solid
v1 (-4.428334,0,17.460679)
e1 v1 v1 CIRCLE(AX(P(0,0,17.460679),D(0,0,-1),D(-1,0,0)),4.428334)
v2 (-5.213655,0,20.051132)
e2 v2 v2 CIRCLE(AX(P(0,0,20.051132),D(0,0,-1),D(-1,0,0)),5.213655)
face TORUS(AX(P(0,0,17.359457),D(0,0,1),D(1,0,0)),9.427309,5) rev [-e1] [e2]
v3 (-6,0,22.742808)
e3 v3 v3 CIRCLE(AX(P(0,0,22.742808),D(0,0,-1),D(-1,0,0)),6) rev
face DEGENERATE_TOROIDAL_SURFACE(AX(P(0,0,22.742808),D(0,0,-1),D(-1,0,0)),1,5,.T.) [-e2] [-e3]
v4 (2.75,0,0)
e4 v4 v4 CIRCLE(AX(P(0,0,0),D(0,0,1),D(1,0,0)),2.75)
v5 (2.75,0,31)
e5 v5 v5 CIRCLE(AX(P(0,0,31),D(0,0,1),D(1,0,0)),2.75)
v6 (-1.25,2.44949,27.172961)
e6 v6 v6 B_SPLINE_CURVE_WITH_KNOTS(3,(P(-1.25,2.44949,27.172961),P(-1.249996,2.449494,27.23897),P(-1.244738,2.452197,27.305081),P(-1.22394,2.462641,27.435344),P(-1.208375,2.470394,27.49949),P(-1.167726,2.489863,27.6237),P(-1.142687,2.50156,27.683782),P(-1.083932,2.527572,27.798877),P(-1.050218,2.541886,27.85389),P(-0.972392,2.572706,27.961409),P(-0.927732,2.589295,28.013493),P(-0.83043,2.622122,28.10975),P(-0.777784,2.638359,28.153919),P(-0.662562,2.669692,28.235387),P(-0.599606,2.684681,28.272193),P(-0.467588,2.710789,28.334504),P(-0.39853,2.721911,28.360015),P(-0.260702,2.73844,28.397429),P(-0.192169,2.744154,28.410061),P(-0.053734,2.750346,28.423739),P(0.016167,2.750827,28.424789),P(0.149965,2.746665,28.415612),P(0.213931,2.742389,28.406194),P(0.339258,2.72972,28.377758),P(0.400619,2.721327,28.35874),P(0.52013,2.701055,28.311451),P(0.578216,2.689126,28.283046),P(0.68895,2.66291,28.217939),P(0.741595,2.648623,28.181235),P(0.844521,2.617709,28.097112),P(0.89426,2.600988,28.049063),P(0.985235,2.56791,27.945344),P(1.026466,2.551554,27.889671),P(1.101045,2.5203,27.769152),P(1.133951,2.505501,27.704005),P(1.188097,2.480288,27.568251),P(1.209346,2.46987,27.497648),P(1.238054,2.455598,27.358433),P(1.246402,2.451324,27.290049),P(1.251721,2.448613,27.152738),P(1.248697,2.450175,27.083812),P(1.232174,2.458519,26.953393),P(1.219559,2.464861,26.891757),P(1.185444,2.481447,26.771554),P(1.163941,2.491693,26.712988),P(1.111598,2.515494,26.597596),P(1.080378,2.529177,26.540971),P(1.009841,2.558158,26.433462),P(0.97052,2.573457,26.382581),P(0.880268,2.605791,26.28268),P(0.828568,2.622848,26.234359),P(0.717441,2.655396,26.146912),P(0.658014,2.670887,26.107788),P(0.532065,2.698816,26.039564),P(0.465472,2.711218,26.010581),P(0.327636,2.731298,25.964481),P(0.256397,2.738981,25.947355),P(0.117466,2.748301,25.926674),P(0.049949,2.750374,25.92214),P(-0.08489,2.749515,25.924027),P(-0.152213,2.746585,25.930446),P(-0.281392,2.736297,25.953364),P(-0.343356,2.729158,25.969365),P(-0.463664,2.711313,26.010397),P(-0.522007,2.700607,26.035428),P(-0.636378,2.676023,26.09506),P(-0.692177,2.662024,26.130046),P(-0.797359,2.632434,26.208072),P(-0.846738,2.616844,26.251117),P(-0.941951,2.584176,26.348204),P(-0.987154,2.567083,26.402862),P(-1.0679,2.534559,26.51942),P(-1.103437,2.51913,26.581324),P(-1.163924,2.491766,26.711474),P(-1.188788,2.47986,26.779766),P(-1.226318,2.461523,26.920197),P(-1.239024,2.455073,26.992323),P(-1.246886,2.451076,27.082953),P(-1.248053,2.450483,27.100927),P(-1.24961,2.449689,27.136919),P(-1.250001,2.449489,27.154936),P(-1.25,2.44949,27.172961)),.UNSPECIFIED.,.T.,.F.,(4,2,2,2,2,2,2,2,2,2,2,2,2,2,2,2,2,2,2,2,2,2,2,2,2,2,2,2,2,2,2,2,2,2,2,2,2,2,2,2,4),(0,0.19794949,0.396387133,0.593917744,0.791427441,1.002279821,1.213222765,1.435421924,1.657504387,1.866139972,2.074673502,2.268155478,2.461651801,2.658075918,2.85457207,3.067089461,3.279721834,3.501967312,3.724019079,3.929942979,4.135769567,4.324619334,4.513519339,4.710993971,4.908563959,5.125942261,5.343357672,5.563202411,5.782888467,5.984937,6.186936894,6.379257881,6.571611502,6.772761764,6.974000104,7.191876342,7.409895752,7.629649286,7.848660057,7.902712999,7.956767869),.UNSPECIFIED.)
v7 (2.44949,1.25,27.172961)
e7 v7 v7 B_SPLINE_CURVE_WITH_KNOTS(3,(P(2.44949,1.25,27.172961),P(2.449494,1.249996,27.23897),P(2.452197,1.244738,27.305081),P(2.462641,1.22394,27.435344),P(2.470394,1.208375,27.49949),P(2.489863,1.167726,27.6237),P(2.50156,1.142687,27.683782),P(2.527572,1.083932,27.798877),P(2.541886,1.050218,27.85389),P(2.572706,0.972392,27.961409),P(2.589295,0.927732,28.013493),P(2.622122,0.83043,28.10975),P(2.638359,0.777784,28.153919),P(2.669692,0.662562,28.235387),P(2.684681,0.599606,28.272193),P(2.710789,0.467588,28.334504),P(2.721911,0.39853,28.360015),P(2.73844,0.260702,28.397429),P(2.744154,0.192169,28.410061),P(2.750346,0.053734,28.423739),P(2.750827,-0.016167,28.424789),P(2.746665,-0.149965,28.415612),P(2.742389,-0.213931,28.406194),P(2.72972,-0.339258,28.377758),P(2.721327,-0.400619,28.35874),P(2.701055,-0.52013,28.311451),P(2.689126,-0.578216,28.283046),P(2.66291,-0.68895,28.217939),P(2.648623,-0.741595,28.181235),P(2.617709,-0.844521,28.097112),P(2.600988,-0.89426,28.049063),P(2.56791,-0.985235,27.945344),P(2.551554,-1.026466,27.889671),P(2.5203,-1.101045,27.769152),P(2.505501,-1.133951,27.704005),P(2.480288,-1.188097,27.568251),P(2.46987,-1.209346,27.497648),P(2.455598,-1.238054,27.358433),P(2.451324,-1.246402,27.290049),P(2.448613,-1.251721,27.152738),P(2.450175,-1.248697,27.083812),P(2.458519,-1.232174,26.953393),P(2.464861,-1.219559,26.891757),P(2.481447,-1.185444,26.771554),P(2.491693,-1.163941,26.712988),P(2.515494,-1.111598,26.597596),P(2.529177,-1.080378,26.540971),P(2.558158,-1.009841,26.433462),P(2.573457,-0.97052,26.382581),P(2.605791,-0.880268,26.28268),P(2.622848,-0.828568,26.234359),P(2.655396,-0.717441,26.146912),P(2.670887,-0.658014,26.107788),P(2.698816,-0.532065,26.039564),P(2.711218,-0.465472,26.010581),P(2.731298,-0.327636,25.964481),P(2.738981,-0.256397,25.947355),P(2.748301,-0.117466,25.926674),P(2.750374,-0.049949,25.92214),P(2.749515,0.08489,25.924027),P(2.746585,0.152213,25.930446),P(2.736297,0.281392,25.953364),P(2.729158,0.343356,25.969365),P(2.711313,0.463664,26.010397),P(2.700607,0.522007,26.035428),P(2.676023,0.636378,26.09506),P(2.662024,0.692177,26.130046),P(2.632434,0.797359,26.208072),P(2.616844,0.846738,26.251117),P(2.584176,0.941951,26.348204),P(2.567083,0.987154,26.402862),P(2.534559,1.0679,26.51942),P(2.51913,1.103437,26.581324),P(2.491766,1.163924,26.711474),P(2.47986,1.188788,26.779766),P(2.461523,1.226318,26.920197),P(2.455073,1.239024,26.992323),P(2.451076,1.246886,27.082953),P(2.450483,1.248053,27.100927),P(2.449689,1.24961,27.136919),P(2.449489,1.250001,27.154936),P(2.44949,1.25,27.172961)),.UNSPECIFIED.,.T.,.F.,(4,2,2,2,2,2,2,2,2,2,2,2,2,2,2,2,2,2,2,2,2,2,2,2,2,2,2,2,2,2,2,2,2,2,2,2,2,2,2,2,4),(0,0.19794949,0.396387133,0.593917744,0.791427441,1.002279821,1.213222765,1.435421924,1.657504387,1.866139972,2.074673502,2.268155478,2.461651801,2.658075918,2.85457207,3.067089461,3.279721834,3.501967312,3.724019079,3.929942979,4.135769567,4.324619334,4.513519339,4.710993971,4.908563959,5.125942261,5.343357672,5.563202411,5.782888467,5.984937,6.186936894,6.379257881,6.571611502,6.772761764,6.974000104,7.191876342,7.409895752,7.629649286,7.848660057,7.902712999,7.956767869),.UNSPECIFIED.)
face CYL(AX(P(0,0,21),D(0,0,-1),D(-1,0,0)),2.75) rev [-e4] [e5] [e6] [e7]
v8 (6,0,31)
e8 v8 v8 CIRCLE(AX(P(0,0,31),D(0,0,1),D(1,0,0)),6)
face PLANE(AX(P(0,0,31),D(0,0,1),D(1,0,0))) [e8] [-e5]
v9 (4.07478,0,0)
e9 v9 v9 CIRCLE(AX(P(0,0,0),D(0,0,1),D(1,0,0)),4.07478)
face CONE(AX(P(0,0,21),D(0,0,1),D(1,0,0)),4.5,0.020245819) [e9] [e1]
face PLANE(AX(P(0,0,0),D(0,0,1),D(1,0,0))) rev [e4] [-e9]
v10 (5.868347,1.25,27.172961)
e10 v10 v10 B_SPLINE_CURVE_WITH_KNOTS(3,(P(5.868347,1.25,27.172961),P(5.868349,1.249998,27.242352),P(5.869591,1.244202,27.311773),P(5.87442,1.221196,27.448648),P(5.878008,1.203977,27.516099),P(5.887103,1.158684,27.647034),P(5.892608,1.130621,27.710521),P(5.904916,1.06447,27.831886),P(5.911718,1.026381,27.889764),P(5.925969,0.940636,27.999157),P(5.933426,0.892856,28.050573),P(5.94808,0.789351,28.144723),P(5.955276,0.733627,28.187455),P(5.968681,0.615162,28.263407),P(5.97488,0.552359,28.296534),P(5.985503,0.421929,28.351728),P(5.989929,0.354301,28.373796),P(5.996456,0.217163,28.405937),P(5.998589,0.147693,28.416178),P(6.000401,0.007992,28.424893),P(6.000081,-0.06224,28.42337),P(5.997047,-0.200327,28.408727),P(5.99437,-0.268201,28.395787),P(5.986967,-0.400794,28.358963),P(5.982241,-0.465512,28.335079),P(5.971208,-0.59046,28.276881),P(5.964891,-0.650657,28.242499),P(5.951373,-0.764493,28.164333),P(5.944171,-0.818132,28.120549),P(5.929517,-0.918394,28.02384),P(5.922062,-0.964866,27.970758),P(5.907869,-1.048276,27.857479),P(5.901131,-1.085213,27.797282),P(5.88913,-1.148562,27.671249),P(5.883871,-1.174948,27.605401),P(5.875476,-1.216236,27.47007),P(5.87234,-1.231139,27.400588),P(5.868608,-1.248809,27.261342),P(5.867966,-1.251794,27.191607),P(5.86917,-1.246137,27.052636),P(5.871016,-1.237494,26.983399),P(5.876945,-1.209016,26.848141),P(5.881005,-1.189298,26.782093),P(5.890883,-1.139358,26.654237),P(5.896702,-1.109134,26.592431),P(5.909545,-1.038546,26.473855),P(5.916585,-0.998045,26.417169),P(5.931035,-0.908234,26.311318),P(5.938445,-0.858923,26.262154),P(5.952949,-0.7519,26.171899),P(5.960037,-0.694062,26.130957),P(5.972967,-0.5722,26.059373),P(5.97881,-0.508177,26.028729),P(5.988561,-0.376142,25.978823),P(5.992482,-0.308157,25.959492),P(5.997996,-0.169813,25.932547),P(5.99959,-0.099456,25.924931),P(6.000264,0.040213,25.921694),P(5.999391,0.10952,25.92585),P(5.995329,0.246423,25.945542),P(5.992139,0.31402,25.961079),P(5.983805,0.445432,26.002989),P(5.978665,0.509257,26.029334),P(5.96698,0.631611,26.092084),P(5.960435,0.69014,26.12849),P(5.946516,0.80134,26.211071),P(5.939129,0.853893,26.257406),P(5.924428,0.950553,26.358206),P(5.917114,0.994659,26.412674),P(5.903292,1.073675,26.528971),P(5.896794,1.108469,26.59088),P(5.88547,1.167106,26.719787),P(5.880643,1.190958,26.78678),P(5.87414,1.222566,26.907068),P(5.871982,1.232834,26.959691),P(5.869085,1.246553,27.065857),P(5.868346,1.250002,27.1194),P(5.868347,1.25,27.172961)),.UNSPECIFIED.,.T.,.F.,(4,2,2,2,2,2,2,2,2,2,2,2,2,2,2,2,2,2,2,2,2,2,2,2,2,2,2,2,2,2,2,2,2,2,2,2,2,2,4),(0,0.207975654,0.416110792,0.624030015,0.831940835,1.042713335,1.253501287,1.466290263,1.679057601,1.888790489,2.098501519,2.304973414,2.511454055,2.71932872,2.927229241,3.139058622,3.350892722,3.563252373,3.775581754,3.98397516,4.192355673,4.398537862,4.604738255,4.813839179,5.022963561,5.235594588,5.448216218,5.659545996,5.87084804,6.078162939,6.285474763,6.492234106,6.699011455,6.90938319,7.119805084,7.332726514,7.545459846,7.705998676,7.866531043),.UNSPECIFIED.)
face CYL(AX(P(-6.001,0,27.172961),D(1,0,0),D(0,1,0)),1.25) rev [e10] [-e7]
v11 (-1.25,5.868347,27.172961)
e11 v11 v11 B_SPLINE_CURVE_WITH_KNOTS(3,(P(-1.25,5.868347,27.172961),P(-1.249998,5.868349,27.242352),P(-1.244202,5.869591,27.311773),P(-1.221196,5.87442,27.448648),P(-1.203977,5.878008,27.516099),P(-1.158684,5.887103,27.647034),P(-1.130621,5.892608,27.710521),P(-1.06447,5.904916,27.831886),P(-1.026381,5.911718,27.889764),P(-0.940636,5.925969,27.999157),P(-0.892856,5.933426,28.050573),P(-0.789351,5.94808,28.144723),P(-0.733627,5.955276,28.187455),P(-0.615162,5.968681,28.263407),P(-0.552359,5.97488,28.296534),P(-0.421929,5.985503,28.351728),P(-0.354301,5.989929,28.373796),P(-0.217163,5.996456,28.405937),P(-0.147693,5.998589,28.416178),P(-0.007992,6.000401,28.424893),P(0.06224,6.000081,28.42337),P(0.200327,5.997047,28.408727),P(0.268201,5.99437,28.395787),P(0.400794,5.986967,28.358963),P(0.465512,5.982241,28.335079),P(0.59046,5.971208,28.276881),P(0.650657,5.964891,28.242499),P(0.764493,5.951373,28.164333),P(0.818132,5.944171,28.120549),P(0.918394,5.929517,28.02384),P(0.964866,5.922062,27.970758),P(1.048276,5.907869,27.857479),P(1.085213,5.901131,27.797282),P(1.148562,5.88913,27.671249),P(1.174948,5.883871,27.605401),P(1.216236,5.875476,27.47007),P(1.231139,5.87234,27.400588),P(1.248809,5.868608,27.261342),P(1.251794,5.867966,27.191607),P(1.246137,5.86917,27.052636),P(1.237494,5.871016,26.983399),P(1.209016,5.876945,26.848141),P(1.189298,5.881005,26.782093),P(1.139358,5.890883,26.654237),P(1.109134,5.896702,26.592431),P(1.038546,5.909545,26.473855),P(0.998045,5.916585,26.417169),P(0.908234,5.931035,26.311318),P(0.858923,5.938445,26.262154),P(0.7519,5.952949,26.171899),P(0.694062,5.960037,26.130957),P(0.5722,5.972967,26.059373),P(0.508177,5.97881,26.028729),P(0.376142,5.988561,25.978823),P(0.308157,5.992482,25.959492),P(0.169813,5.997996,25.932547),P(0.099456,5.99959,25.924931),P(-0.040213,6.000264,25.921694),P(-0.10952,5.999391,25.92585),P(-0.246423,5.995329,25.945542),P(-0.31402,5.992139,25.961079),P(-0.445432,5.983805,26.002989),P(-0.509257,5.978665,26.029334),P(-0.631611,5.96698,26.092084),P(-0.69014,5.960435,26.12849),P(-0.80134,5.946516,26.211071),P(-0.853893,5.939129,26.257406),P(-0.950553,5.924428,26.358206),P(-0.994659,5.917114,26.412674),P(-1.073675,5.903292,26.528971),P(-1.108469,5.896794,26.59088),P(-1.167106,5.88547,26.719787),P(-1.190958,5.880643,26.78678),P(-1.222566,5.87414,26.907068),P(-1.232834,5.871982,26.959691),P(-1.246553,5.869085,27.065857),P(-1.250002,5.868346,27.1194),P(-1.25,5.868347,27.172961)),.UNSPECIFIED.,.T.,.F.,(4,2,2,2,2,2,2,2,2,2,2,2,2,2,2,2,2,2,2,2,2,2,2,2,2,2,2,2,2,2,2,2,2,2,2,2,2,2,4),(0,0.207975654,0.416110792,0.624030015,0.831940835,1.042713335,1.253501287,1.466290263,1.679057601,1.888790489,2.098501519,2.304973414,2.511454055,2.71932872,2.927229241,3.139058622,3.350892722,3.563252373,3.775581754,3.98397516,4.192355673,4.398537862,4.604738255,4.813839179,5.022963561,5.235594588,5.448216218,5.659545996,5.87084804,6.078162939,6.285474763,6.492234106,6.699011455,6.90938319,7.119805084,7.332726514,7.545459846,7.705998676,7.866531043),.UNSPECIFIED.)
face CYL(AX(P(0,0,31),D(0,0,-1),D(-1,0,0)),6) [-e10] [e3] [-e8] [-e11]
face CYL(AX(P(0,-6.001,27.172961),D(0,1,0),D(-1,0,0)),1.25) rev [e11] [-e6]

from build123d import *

# Parameters (mm, degrees)
SKETCH1_R               = 4.5
SKETCH1_R_2             = 2.75
BOSS_EXTRUDE1_DEPTH     = 21
DRAFT1_ANGLE            = -1.16
SKETCH2_R               = 6
SKETCH2_R_2             = 2.75
BOSS_EXTRUDE2_DEPTH     = 10
FILLET2_R               = 5
CUT_EXTRUDE1_REACH      = 35.779
CUT_EXTRUDE1_END_RADIUS = 2.75
SKETCH4_R               = 1.25
CIRPATTERN1_COUNT       = 2
CIRPATTERN1_ANGLE       = 90


with BuildPart() as part:
    # Sketch1 → Boss-Extrude1 (new body)
    with BuildSketch(Plane.XY):
        with Locations(Location((0, 0, 0), (0, 0, 180))):
            Circle(SKETCH1_R)
        with Locations(Location((0, 0, 0), (0, 0, 180))):
            Circle(SKETCH1_R_2, mode=Mode.SUBTRACT)
    extrude(amount=BOSS_EXTRUDE1_DEPTH)

    # Draft1
    draft1_faces = [part.faces().sort_by_distance(p)[0] for p in [
        (4.5, 0, 10.5),
    ]]
    draft(draft1_faces, Plane.XY.offset(21), DRAFT1_ANGLE)

    # Sketch2 → Boss-Extrude2 (add)
    with BuildSketch(Plane.XY.offset(21)):
        Circle(SKETCH2_R)
        with Locations(Location((0, 0, 0), (0, 0, 180))):
            Circle(SKETCH2_R_2, mode=Mode.SUBTRACT)
    extrude(amount=BOSS_EXTRUDE2_DEPTH)

    # Fillet1: read off the stored shape, not the designer's step
    # Fillet1 outline → Fillet1 (revolve)
    with BuildSketch(Plane.XZ):
        with BuildLine():
            Line((6, 21), (4.42833376, 21))
            Line((4.42833376, 21), (4.42833376, 17.460679283))
            ThreePointArc((4.42833376, 17.460679283), (4.857597383, 19.388677437), (6, 21))
        make_face()
    revolve(axis=Axis((0, 0, 0), (0, 0, 1)))

    # Fillet2
    fillet2_edges = [part.edges().sort_by_distance(p)[0] for p in [
        (-6, 0, 21),
    ]]
    fillet(fillet2_edges, radius=FILLET2_R)

    # Cut-Extrude1: up to this cylinder (the profile starts outside it)
    cut_extrude1_end = Plane(origin=(0, 0, 27.172961), z_dir=(0, 0, -1)) * Cylinder(CUT_EXTRUDE1_END_RADIUS, 78.058, mode=Mode.PRIVATE)
    # Sketch4 → Cut-Extrude1 (cut, up to the surface)
    with BuildSketch(Plane(origin=(6, 0, 31), x_dir=(0, 0, -1), z_dir=(1, 0, 0)), mode=Mode.PRIVATE) as cut_extrude1_sk1:
        with Locations(Location((3.827038513, 0, 0), (0, 0, 90))):
            Circle(SKETCH4_R)
    cut_extrude1_tool1 = extrude(cut_extrude1_sk1.sketch, amount=-CUT_EXTRUDE1_REACH, mode=Mode.PRIVATE) - cut_extrude1_end
    cut_extrude1 = cut_extrude1_tool1.solids().sort_by_distance((6, 0, 27.172961))[0]
    add(cut_extrude1, mode=Mode.SUBTRACT)

    # CirPattern1: Cut-Extrude1 ×2 about axis
    cirpattern1_axis = Axis((0, 0, 0), (0, 0, 1))
    for i in range(1, CIRPATTERN1_COUNT):
        add(cut_extrude1.rotate(cirpattern1_axis, i * CIRPATTERN1_ANGLE / (CIRPATTERN1_COUNT - 1)), mode=Mode.SUBTRACT)


solid = part.part
